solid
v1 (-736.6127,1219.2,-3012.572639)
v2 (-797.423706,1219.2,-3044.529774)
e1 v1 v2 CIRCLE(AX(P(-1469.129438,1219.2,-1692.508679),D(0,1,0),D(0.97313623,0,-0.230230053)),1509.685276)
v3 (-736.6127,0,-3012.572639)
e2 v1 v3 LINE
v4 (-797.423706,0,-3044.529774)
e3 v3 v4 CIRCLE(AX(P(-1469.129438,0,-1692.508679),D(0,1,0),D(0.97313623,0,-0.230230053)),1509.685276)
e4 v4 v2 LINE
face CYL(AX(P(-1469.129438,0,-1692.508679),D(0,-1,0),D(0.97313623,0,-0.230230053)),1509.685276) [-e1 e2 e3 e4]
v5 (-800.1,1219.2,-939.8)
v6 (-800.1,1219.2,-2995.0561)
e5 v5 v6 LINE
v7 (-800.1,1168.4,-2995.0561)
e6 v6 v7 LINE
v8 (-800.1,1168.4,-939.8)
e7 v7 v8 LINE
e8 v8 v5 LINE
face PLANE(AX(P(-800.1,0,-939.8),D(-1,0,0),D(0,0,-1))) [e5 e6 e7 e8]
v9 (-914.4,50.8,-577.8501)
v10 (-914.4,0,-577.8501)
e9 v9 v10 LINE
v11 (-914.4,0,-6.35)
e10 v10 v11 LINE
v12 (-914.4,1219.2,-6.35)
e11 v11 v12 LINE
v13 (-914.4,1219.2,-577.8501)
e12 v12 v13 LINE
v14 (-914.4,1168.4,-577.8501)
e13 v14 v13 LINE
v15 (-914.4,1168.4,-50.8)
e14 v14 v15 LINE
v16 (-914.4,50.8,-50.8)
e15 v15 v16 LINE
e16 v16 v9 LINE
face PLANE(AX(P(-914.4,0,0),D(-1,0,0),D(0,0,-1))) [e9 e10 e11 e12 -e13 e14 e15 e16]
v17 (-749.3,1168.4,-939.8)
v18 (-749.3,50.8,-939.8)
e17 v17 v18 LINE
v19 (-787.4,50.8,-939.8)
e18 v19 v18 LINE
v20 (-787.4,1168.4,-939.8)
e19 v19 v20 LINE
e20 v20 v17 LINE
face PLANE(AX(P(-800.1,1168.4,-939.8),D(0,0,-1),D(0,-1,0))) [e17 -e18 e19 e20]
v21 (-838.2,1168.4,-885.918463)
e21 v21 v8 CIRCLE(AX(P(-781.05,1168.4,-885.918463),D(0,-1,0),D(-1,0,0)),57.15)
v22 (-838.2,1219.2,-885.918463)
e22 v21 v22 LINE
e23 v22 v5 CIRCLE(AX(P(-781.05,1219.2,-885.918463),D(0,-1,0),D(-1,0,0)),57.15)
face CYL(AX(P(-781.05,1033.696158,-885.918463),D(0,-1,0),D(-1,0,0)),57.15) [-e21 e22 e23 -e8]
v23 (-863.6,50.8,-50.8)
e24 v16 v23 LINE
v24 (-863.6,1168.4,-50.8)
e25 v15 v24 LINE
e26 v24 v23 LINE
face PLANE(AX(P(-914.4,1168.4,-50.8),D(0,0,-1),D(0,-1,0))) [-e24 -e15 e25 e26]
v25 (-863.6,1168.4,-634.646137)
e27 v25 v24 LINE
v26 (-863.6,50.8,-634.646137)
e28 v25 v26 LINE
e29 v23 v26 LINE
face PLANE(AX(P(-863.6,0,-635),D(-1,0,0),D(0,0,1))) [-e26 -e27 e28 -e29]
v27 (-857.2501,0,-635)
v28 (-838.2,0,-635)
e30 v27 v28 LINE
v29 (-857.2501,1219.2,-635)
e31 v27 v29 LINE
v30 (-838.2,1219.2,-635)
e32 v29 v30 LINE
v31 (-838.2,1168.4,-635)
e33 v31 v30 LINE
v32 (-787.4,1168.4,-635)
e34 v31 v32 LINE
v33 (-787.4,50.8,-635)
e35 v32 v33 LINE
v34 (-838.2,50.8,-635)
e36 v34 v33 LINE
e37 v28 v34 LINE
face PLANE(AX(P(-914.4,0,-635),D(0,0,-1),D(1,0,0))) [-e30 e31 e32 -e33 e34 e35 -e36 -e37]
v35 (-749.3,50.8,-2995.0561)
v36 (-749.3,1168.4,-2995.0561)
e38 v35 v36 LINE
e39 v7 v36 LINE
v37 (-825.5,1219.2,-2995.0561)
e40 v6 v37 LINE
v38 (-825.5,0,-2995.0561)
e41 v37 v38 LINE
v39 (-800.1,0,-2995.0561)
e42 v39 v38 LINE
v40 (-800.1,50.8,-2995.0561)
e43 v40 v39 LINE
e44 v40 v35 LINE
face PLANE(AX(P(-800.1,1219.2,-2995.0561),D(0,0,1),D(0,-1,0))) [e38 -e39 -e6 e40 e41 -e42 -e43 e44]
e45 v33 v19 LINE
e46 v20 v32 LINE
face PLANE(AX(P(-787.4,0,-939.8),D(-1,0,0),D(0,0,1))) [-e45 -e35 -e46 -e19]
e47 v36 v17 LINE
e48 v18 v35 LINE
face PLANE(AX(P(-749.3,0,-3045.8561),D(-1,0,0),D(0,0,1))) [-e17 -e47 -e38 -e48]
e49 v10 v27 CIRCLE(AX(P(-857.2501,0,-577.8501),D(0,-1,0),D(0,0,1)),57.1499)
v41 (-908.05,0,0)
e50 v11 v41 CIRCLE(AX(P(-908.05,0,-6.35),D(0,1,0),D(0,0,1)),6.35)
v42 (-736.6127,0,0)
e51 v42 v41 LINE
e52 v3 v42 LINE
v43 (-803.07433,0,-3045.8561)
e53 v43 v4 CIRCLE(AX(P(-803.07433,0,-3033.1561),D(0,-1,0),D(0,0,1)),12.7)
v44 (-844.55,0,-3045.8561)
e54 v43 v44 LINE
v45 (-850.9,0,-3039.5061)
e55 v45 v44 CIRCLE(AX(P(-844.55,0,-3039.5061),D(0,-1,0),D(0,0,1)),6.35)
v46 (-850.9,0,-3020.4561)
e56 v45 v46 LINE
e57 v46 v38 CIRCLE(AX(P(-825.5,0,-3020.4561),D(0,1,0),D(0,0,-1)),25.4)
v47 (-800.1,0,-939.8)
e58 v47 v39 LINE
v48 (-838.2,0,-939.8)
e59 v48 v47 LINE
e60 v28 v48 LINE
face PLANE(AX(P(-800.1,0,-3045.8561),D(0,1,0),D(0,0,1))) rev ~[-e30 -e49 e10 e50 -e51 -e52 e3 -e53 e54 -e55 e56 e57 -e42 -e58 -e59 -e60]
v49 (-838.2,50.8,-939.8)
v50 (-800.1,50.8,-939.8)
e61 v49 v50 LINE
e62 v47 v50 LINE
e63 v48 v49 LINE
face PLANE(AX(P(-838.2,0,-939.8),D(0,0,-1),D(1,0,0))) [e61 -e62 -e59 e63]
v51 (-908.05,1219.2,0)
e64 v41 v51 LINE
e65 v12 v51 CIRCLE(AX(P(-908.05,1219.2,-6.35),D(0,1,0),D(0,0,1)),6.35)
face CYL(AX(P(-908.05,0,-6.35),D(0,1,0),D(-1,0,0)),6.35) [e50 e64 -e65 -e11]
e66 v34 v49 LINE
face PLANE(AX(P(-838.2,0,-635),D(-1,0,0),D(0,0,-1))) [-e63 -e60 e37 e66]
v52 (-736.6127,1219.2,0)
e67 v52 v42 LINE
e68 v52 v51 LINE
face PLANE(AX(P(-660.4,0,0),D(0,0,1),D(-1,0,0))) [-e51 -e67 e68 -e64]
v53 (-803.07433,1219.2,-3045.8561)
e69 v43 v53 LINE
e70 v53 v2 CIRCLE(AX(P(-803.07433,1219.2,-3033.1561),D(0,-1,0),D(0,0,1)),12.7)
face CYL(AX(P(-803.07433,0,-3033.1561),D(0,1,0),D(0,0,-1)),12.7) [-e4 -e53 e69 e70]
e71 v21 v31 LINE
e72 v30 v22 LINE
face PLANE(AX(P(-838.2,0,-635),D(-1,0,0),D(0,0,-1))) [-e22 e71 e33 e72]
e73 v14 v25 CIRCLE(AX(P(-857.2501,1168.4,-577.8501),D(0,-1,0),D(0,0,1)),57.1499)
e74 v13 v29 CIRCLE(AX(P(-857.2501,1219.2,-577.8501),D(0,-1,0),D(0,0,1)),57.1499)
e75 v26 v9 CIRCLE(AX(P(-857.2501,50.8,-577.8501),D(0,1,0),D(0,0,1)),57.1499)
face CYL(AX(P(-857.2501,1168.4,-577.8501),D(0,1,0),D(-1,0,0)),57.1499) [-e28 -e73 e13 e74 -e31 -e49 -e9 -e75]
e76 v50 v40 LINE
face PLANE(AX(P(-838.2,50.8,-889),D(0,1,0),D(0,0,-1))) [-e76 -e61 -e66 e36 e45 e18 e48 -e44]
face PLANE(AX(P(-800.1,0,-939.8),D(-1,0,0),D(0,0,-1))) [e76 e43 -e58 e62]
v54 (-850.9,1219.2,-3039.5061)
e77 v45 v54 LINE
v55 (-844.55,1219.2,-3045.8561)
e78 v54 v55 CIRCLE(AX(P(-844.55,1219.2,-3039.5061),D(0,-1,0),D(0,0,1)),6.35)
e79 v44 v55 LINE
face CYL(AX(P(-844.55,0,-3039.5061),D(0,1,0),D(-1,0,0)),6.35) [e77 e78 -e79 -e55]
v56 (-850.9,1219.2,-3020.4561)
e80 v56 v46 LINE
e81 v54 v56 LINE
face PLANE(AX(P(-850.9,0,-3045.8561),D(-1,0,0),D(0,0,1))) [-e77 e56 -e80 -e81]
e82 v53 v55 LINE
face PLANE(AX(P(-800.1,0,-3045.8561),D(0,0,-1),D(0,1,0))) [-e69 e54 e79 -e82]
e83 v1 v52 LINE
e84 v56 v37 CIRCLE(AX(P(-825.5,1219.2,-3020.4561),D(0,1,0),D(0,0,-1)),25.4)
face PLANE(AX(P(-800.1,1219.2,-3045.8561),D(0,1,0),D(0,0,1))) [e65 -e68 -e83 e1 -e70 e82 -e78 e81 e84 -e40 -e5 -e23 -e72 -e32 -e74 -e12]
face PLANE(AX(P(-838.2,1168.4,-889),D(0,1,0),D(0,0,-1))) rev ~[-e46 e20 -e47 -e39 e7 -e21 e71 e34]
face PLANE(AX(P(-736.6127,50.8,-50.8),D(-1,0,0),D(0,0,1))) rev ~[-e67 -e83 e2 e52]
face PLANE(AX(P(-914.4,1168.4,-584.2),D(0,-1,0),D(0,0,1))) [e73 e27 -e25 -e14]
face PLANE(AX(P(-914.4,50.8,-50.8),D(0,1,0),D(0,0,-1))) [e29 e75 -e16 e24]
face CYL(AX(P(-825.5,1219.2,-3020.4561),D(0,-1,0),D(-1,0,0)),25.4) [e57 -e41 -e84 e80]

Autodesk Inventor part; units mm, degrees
ref_plane "YZ Plane" through (0, 0, 0) normal (1, 0, 0) x (0, 1, 0)
ref_plane "XZ Plane" through (0, 0, 0) normal (0, 1, 0) x (-1, 0, 0)
ref_plane "XY Plane" through (0, 0, 0) normal (0, 0, 1) x (1, 0, 0)
sketch "Sketch1" plane through (0, 0, 0) normal (0, 1, 0) x (-1, 0, 0)
  line L0 (0, 0) -> (914.4, 0)
  line L1 (914.4, 0) -> (914.4, -70.0282)
  line L2 (0, 0) -> (508, 0)
  line L3 (914.4, 0) -> (660.4, 0)
  line L4 (660.4, 0) -> (611.4196, -58.3726)
  arc A0 (611.4196, -58.3726) -> (0, -274.3016) centre (714.4556, -1323.7323) ccw
  arc A1 (0, -2040.0836) -> (800.1, -3045.8561) centre (1469.1296, -1692.5086) ccw
  arc A2 (0, -274.3016) -> (0, -2040.0836) centre (7568.6791, -1157.1926) ccw
  line L5 (914.4, 0) -> (660.4, 0)
  line L6 (914.4, 0) -> (914.4, -635)
  line L7 (914.4, -635) -> (838.2, -635)
  line L8 (838.2, -635) -> (838.2, -939.8)
  line L9 (838.2, -939.8) -> (800.1, -939.8)
  line L10 (800.1, -939.8) -> (800.1, -3045.8561)
  dimension "d1" = 3048
  dimension "d2" = 508
  dimension "d11" = 76.2
  dimension "d12" = 130
  dimension "d14" = 7620
  dimension "d15" = 635
  dimension "d16" = 76.2
  dimension "d17" = 304.8
  dimension "d18" = 38.1
extrude "Extrusion1" add sketch "Sketch1" along normal blind 1219.2
sketch "Sketch3" plane through (-914.4, 0, -635) normal (-1, 0, 0) x (0, 0, 1)
  line L0 (0, 0) -> (635, 0) projected
  line L1 (0, 0) -> (0, 1219.2) projected
  line L2 (635, 0) -> (0, 0)
  line L3 (0, 0) -> (0, 1219.2)
  line L4 (0, 1219.2) -> (635, 1219.2)
  line L5 (635, 1219.2) -> (635, 0)
  line L6 (584.2, 50.8) -> (50.8, 50.8)
  line L7 (50.8, 1168.4) -> (584.2, 1168.4)
  line L8 (584.2, 1168.4) -> (584.2, 50.8)
  line L9 (50.8, 50.8) -> (0, 50.8)
  line L10 (0, 0) -> (0, 1219.2) projected
  line L11 (0, 50.8) -> (0, 1168.4)
  line L12 (50.8, 1168.4) -> (0, 1168.4)
  point P0 (0, 1168.4)
  dimension "d24" = 50.8
extrude "Extrusion3" cut sketch "Sketch3" against normal blind 50.8 contours L1 L12 L7 L8 L6 L9
sketch "Sketch4" plane through (-838.2, 0, -939.8) normal (-1, 0, 0) x (0, 0, 1)
  line L0 (0, 1219.2) -> (304.8, 1219.2) projected
  line L1 (304.8, 0) -> (0, 0)
  line L2 (0, 0) -> (0, 1219.2)
  line L3 (0, 1219.2) -> (304.8, 1219.2)
  line L4 (304.8, 1219.2) -> (304.8, 0)
  line L5 (254, 50.8) -> (50.8, 50.8)
  line L6 (50.8, 1168.4) -> (254, 1168.4)
  line L7 (50.8, 1168.4) -> (0, 1168.4)
  line L8 (0, 0) -> (0, 1219.2) projected
  line L9 (50.8, 50.8) -> (0, 50.8)
  line L10 (0, 50.8) -> (0, 1168.4)
  line L11 (254, 50.8) -> (304.8, 50.8)
  line L12 (304.8, 50.8) -> (304.8, 1168.4)
  line L13 (304.8, 0) -> (304.8, 1219.2) projected
  line L14 (254, 1168.4) -> (304.8, 1168.4)
  point P0 (939.8, 0)
extrude "Extrusion4" cut sketch "Sketch4" against normal blind 50.8 contours L7 L6 L14 L4 L11 L5 L9 L2
sketch "Sketch5" plane through (-800.1, 0, -3045.8561) normal (-1, 0, 0) x (0, 0, 1)
  line L0 (0, 1219.2) -> (2106.0561, 1219.2) projected
  line L1 (2106.0561, 0) -> (0, 0)
  line L2 (0, 0) -> (0, 1219.2)
  line L3 (0, 1219.2) -> (2106.0561, 1219.2)
  line L4 (2106.0561, 1219.2) -> (2106.0561, 0)
  line L5 (2055.2561, 50.8) -> (50.8, 50.8)
  line L6 (50.8, 50.8) -> (50.8, 1168.4)
  line L7 (50.8, 1168.4) -> (2055.2561, 1168.4)
  line L8 (2055.2561, 50.8) -> (2106.0561, 50.8)
  line L9 (2106.0561, 0) -> (2106.0561, 1219.2) projected
  line L10 (2106.0561, 1168.4) -> (2106.0561, 1219.2) projected
  line L11 (2055.2561, 1168.4) -> (2106.0561, 1168.4)
  line L12 (2106.0561, 1168.4) -> (2106.0561, 50.8)
  point P0 (3045.8561, 0)
extrude "Extrusion5" cut sketch "Sketch5" against normal blind 50.8 contours L4 L8 L5 L6 L7 L11
sketch "Sketch6" plane through (-800.1, 0, -3045.8561) normal (-1, 0, 0) x (0, 0, 1)
  line L0 (0, 0) -> (0, 1219.2) projected
  line L1 (0, 0) -> (2106.0561, 0) projected
  line L2 (0, 1219.2) -> (50.8, 1219.2)
  line L3 (50.8, 1219.2) -> (50.8, 0)
  line L4 (50.8, 0) -> (0, 0)
  line L5 (0, 0) -> (0, 1219.2)
  point P0 (3045.8561, 0)
  dimension "d33" = 50.8
extrude "Extrusion6" add sketch "Sketch6" along normal blind 50.8
fillet "Fillet1" radius 25.4 1 edges at (-850.9, 609.6, -2995.0561)
fillet "Fillet2" radius 6.35 1 edges at (-850.9, 609.6, -3045.8561)
fillet "Fillet3" radius 12.7 1 edges at (-800.1, 609.6, -3045.8561)
fillet "Fillet4" radius 25.4 1 edges at (0, 609.6, -274.3016)
fillet "Fillet5" radius 57.15 1 edges at (-914.4, 1193.8, -635)
fillet "Fillet6" radius 57.15 1 edges at (-838.2, 1193.8, -939.8)
fillet "Fillet7" radius 6.35 1 edges at (-914.4, 609.6, 0)
ref_plane "Work Plane6" through (-736.6, 50.8, -50.8) normal (-1, 0, 0) x (0, 0, 1)
ref_plane "Work Plane7" through (128.5875, 50.8, -50.8) normal (-1, 0, 0) x (0, 0, 1)
sketch "Sketch9" plane through (128.5875, 50.8, -50.8) normal (-1, 0, 0) x (0, 0, 1)
  line L0 (204.9292, -115.2136) -> (-3165.499, -115.2136)
  line L1 (-3165.499, -115.2136) -> (-3165.499, 1233.5764)
  line L2 (-3165.499, 1233.5764) -> (204.9292, 1233.5764)
  line L3 (204.9292, 1233.5764) -> (204.9292, -115.2136)
  point P0 (50.8, -50.8)
extrude "Extrusion7" cut sketch "Sketch9" along normal blind 865.2002
properties part number "ShipDesign-ver3-1111-2021" material "Wood (Oak)"
